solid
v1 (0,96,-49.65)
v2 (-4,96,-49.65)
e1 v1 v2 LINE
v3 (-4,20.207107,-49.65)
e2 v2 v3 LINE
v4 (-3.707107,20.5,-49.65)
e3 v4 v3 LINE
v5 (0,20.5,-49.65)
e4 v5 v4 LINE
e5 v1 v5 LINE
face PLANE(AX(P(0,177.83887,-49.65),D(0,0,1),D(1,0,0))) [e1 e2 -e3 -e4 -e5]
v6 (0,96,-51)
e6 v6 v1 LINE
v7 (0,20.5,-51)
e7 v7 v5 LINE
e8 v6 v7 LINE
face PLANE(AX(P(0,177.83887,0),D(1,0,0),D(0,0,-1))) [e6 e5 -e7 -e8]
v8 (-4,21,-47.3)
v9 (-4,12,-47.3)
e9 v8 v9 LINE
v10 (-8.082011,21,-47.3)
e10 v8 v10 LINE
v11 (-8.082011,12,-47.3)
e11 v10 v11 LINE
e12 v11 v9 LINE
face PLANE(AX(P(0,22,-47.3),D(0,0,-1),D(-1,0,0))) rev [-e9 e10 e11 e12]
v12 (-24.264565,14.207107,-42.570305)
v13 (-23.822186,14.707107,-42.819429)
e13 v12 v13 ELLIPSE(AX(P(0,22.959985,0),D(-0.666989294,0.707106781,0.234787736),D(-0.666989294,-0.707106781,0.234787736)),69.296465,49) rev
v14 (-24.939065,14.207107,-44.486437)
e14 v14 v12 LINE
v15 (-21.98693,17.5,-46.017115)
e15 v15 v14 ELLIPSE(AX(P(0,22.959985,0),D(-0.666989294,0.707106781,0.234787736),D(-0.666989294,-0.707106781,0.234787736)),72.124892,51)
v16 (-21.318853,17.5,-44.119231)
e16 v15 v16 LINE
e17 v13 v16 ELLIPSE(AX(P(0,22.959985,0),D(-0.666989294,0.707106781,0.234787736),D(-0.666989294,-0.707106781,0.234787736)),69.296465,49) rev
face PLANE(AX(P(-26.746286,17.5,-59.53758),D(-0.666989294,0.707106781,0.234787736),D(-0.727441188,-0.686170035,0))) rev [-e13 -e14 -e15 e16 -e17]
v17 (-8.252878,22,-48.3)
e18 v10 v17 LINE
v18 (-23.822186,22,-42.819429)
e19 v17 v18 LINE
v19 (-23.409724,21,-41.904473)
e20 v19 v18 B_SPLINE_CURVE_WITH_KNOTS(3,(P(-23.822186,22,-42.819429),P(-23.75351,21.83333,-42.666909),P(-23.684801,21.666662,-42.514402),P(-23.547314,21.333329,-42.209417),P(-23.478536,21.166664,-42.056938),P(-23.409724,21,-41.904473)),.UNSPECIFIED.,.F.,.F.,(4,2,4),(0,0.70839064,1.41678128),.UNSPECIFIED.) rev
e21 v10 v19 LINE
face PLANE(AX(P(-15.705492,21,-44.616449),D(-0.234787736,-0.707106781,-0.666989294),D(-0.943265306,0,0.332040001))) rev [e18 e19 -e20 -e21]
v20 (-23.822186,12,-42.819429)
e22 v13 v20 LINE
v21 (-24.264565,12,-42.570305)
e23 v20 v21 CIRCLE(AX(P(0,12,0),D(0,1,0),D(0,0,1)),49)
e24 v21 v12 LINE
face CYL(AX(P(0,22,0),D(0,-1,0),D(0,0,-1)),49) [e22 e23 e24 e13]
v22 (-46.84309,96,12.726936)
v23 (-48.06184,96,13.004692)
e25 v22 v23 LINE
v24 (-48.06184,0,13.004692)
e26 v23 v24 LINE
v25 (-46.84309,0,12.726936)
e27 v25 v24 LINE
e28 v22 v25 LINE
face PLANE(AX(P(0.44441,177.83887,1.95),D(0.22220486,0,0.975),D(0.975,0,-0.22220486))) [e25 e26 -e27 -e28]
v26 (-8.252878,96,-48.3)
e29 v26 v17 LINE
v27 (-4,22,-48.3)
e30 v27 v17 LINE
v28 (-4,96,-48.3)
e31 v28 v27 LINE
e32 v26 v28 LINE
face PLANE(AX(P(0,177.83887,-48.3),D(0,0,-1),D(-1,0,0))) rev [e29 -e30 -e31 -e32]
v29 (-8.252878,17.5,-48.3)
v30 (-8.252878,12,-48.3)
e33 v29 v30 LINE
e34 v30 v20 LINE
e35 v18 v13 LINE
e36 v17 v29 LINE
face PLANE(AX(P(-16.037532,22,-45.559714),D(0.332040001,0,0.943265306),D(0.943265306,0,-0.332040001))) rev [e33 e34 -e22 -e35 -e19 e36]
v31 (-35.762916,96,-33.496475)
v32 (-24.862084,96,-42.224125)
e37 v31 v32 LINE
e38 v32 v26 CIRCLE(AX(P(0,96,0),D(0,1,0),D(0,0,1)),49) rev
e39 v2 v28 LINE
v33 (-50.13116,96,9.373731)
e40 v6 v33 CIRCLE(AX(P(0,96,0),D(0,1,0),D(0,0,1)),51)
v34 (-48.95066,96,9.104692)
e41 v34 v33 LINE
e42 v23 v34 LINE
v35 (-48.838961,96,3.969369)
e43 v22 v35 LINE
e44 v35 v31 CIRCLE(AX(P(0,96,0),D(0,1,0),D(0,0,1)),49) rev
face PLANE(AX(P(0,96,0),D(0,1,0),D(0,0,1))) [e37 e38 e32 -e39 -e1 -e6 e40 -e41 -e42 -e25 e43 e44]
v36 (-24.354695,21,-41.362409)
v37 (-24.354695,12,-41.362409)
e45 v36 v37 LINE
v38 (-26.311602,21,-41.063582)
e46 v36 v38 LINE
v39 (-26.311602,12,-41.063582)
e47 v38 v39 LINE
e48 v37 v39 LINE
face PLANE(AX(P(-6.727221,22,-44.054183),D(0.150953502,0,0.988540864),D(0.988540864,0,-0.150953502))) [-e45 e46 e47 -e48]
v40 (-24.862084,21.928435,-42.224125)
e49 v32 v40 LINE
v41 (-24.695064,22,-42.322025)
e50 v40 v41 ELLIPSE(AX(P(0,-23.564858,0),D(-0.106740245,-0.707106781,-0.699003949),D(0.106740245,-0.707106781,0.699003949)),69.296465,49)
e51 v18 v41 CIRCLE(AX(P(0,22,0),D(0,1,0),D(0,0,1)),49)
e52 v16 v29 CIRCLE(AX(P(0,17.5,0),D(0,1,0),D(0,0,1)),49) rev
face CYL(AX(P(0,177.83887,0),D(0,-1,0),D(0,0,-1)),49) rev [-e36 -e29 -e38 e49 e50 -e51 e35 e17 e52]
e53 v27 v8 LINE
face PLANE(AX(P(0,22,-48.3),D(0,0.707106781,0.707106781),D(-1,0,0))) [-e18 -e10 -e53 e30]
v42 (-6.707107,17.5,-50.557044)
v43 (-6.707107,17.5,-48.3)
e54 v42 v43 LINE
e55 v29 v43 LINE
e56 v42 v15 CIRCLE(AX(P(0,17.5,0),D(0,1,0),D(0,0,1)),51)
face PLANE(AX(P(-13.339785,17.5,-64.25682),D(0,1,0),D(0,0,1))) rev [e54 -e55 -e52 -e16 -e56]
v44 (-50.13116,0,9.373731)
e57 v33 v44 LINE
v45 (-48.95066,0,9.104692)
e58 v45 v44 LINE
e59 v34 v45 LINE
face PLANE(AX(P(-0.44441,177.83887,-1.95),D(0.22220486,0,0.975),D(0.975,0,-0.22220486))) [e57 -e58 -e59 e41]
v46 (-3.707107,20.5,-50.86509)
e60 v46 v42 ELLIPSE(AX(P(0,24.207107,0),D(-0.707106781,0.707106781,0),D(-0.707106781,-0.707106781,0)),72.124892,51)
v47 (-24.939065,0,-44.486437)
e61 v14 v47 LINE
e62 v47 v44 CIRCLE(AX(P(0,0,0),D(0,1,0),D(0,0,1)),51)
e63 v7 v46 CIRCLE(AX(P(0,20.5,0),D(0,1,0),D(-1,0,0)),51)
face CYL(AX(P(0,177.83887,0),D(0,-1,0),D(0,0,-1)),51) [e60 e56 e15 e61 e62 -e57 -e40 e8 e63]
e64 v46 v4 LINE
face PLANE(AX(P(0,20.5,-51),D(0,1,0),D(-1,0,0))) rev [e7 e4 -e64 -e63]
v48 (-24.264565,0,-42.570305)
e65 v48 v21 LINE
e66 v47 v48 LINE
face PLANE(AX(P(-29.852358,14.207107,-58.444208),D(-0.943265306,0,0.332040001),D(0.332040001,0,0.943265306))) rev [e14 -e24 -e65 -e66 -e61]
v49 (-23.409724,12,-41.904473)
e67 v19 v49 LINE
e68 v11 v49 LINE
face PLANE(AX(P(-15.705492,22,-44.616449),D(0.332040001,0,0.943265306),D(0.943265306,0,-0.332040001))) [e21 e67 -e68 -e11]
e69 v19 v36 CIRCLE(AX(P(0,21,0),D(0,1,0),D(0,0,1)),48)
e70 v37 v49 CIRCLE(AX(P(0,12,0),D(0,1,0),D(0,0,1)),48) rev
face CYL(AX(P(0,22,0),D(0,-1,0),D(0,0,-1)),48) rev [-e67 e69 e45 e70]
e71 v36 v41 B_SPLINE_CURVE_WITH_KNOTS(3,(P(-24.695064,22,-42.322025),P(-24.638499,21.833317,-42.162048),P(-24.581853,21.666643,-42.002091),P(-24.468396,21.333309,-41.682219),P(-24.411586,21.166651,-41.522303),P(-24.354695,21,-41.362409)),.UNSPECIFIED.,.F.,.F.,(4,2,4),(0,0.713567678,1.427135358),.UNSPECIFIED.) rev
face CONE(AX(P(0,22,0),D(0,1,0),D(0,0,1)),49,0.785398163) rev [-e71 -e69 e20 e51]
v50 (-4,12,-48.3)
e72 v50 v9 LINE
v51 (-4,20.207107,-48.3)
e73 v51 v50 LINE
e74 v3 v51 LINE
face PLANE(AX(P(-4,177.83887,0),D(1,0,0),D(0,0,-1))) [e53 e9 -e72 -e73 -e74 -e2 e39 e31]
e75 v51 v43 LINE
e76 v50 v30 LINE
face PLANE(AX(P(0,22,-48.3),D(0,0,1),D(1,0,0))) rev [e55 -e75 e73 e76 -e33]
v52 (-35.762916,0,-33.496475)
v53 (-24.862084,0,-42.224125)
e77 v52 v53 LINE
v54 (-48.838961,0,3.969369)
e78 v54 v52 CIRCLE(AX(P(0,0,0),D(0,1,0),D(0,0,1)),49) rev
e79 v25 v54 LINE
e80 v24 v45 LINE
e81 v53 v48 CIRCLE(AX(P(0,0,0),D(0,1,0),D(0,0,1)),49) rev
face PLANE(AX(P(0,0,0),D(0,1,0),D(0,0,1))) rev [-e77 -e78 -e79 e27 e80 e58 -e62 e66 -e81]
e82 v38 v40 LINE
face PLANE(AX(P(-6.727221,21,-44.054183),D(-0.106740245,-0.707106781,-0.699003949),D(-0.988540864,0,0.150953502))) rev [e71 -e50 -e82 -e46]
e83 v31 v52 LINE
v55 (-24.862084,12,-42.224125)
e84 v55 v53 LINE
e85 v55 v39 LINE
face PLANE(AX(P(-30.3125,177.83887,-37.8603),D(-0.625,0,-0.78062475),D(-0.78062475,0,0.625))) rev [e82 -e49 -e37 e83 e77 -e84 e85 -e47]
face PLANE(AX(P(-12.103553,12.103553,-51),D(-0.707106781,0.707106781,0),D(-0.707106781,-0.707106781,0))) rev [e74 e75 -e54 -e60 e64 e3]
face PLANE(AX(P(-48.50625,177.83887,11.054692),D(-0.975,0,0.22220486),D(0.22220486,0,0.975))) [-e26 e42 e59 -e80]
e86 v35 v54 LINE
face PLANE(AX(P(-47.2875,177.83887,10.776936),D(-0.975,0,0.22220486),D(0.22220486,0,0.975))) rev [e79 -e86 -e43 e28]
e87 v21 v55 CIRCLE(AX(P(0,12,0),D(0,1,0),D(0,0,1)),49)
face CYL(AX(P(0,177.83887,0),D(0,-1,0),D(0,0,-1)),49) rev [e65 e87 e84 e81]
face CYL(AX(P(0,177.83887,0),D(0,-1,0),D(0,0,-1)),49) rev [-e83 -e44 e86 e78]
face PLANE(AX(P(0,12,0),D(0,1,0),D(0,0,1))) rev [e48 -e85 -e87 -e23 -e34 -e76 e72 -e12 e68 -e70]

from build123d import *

# Parameters (mm, degrees)
EXTRUDE_1_DEPTH     = 96
CUT_EXTRUDE_1_DEPTH = 115.435602569
CUT_EXTRUDE_2_DEPTH = 125.800902391
EXTRUDE_2_DEPTH     = 10
CHAMFER_1_SIZE      = 1


with BuildPart() as part:
    # Эскиз1 → Бобышка-Вытянуть1 (new body)
    with BuildSketch(Plane(origin=(0, 0, 0), x_dir=(1, 0, 0), z_dir=(0, 1, 0))):
        with BuildLine():
            Line((-46.843090279, -12.726935731), (-48.838961005, -3.96936871))
            ThreePointArc((-48.838961005, -3.96936871), (-46.263287314, 16.146462365), (-35.762915695, 33.496475352))
            Line((-35.762915695, 33.496475352), (-24.862084305, 42.224125379))
            ThreePointArc((-24.862084305, 42.224125379), (-24.343954807, 42.524955783), (-23.822185811, 42.819428571))
            ThreePointArc((-23.822185811, 42.819428571), (-16.269960049, 46.22), (-8.252878286, 48.3))
            Line((-8.252878286, 48.3), (-4, 48.3))
            Line((-4, 48.3), (-4, 49.65))
            Line((-4, 49.65), (0, 49.65))
            Line((0, 49.65), (0, 51))
            ThreePointArc((0, 51), (-39.236846594, 32.580206711), (-50.131159715, -9.373730613))
            Line((-50.131159715, -9.373730613), (-48.950659721, -9.104691807))
            Line((-48.950659721, -9.104691807), (-48.061840279, -13.004691807))
            Line((-48.061840279, -13.004691807), (-46.843090279, -12.726935731))
        make_face()
    extrude(amount=EXTRUDE_1_DEPTH)

    # Эскиз2 → Вырез-Вытянуть1 (cut, through all)
    with BuildSketch(Plane(origin=(-12.717132038, 0, -36.127061224), x_dir=(0.9432653061224487, 0, -0.33204000100247416), z_dir=(0.33204000100247416, 0, 0.9432653061224487))):
        Polygon((8.752878286, 0), (8.752878286, 17.5), (-5.459985067, 17.5), (-8.752878286, 14.207106781), (-8.752878286, 0), (-8.252878286, 0), (8.252878286, 0), align=None)
    extrude(amount=-CUT_EXTRUDE_1_DEPTH, mode=Mode.SUBTRACT)

    # Эскиз3 → Вырез-Вытянуть2 (cut, through all)
    with BuildSketch(Plane.XY.offset(-48.3)):
        Polygon((-3.5, 20), (0, 20), (0, 20.5), (-3.707106781, 20.5), (-6.707106781, 17.5), (-8.752878286, 17.5), (-8.752878286, 0), (-8.252878286, 0), (-8.252878286, 17), (-6.5, 17), align=None)
        Polygon((0, 0), (0, 20), (-3.5, 20), (-6.5, 17), (-8.252878286, 17), (-8.252878286, 0), align=None)
    extrude(amount=-CUT_EXTRUDE_2_DEPTH, mode=Mode.SUBTRACT)

    # Эскиз4 → Бобышка-Вытянуть2 (add)
    with BuildSketch(Plane(origin=(0, 12, 0), x_dir=(1, 0, 0), z_dir=(0, 1, 0))):
        with BuildLine():
            Line((-20.660349892, 42.872283268), (-8.082011241, 47.3))
            Line((-8.082011241, 47.3), (-4, 47.3))
            Line((-4, 47.3), (-4, 48.3))
            Line((-4, 48.3), (-8.252878286, 48.3))
            Line((-8.252878286, 48.3), (-20.992389893, 43.815548574))
            Line((-20.992389893, 43.815548574), (-23.822185811, 42.819428571))
            ThreePointArc((-23.822185811, 42.819428571), (-24.343954807, 42.524955783), (-24.862084305, 42.224125379))
            Line((-24.862084305, 42.224125379), (-26.311602254, 41.063582213))
            Line((-26.311602254, 41.063582213), (-24.354694829, 41.362408534))
            ThreePointArc((-24.354694829, 41.362408534), (-23.883747135, 41.636121611), (-23.409723676, 41.904472761))
            Line((-23.409723676, 41.904472761), (-20.660349892, 42.872283268))
        make_face()
    extrude(amount=EXTRUDE_2_DEPTH)

    # Фаска1
    chamfer_1_edges = [part.edges().sort_by_distance(p)[0] for p in [
        (-25.333148542, 22, -41.212995374),
        (-23.883747135, 22, -41.636121611),
        (-15.745867458, 22, -44.602236381),
        (-6.04100562, 22, -47.3),
    ]]
    chamfer(chamfer_1_edges, length=CHAMFER_1_SIZE - 0.0001)  # a hair under: the kernel refuses the full size


solid = part.part
